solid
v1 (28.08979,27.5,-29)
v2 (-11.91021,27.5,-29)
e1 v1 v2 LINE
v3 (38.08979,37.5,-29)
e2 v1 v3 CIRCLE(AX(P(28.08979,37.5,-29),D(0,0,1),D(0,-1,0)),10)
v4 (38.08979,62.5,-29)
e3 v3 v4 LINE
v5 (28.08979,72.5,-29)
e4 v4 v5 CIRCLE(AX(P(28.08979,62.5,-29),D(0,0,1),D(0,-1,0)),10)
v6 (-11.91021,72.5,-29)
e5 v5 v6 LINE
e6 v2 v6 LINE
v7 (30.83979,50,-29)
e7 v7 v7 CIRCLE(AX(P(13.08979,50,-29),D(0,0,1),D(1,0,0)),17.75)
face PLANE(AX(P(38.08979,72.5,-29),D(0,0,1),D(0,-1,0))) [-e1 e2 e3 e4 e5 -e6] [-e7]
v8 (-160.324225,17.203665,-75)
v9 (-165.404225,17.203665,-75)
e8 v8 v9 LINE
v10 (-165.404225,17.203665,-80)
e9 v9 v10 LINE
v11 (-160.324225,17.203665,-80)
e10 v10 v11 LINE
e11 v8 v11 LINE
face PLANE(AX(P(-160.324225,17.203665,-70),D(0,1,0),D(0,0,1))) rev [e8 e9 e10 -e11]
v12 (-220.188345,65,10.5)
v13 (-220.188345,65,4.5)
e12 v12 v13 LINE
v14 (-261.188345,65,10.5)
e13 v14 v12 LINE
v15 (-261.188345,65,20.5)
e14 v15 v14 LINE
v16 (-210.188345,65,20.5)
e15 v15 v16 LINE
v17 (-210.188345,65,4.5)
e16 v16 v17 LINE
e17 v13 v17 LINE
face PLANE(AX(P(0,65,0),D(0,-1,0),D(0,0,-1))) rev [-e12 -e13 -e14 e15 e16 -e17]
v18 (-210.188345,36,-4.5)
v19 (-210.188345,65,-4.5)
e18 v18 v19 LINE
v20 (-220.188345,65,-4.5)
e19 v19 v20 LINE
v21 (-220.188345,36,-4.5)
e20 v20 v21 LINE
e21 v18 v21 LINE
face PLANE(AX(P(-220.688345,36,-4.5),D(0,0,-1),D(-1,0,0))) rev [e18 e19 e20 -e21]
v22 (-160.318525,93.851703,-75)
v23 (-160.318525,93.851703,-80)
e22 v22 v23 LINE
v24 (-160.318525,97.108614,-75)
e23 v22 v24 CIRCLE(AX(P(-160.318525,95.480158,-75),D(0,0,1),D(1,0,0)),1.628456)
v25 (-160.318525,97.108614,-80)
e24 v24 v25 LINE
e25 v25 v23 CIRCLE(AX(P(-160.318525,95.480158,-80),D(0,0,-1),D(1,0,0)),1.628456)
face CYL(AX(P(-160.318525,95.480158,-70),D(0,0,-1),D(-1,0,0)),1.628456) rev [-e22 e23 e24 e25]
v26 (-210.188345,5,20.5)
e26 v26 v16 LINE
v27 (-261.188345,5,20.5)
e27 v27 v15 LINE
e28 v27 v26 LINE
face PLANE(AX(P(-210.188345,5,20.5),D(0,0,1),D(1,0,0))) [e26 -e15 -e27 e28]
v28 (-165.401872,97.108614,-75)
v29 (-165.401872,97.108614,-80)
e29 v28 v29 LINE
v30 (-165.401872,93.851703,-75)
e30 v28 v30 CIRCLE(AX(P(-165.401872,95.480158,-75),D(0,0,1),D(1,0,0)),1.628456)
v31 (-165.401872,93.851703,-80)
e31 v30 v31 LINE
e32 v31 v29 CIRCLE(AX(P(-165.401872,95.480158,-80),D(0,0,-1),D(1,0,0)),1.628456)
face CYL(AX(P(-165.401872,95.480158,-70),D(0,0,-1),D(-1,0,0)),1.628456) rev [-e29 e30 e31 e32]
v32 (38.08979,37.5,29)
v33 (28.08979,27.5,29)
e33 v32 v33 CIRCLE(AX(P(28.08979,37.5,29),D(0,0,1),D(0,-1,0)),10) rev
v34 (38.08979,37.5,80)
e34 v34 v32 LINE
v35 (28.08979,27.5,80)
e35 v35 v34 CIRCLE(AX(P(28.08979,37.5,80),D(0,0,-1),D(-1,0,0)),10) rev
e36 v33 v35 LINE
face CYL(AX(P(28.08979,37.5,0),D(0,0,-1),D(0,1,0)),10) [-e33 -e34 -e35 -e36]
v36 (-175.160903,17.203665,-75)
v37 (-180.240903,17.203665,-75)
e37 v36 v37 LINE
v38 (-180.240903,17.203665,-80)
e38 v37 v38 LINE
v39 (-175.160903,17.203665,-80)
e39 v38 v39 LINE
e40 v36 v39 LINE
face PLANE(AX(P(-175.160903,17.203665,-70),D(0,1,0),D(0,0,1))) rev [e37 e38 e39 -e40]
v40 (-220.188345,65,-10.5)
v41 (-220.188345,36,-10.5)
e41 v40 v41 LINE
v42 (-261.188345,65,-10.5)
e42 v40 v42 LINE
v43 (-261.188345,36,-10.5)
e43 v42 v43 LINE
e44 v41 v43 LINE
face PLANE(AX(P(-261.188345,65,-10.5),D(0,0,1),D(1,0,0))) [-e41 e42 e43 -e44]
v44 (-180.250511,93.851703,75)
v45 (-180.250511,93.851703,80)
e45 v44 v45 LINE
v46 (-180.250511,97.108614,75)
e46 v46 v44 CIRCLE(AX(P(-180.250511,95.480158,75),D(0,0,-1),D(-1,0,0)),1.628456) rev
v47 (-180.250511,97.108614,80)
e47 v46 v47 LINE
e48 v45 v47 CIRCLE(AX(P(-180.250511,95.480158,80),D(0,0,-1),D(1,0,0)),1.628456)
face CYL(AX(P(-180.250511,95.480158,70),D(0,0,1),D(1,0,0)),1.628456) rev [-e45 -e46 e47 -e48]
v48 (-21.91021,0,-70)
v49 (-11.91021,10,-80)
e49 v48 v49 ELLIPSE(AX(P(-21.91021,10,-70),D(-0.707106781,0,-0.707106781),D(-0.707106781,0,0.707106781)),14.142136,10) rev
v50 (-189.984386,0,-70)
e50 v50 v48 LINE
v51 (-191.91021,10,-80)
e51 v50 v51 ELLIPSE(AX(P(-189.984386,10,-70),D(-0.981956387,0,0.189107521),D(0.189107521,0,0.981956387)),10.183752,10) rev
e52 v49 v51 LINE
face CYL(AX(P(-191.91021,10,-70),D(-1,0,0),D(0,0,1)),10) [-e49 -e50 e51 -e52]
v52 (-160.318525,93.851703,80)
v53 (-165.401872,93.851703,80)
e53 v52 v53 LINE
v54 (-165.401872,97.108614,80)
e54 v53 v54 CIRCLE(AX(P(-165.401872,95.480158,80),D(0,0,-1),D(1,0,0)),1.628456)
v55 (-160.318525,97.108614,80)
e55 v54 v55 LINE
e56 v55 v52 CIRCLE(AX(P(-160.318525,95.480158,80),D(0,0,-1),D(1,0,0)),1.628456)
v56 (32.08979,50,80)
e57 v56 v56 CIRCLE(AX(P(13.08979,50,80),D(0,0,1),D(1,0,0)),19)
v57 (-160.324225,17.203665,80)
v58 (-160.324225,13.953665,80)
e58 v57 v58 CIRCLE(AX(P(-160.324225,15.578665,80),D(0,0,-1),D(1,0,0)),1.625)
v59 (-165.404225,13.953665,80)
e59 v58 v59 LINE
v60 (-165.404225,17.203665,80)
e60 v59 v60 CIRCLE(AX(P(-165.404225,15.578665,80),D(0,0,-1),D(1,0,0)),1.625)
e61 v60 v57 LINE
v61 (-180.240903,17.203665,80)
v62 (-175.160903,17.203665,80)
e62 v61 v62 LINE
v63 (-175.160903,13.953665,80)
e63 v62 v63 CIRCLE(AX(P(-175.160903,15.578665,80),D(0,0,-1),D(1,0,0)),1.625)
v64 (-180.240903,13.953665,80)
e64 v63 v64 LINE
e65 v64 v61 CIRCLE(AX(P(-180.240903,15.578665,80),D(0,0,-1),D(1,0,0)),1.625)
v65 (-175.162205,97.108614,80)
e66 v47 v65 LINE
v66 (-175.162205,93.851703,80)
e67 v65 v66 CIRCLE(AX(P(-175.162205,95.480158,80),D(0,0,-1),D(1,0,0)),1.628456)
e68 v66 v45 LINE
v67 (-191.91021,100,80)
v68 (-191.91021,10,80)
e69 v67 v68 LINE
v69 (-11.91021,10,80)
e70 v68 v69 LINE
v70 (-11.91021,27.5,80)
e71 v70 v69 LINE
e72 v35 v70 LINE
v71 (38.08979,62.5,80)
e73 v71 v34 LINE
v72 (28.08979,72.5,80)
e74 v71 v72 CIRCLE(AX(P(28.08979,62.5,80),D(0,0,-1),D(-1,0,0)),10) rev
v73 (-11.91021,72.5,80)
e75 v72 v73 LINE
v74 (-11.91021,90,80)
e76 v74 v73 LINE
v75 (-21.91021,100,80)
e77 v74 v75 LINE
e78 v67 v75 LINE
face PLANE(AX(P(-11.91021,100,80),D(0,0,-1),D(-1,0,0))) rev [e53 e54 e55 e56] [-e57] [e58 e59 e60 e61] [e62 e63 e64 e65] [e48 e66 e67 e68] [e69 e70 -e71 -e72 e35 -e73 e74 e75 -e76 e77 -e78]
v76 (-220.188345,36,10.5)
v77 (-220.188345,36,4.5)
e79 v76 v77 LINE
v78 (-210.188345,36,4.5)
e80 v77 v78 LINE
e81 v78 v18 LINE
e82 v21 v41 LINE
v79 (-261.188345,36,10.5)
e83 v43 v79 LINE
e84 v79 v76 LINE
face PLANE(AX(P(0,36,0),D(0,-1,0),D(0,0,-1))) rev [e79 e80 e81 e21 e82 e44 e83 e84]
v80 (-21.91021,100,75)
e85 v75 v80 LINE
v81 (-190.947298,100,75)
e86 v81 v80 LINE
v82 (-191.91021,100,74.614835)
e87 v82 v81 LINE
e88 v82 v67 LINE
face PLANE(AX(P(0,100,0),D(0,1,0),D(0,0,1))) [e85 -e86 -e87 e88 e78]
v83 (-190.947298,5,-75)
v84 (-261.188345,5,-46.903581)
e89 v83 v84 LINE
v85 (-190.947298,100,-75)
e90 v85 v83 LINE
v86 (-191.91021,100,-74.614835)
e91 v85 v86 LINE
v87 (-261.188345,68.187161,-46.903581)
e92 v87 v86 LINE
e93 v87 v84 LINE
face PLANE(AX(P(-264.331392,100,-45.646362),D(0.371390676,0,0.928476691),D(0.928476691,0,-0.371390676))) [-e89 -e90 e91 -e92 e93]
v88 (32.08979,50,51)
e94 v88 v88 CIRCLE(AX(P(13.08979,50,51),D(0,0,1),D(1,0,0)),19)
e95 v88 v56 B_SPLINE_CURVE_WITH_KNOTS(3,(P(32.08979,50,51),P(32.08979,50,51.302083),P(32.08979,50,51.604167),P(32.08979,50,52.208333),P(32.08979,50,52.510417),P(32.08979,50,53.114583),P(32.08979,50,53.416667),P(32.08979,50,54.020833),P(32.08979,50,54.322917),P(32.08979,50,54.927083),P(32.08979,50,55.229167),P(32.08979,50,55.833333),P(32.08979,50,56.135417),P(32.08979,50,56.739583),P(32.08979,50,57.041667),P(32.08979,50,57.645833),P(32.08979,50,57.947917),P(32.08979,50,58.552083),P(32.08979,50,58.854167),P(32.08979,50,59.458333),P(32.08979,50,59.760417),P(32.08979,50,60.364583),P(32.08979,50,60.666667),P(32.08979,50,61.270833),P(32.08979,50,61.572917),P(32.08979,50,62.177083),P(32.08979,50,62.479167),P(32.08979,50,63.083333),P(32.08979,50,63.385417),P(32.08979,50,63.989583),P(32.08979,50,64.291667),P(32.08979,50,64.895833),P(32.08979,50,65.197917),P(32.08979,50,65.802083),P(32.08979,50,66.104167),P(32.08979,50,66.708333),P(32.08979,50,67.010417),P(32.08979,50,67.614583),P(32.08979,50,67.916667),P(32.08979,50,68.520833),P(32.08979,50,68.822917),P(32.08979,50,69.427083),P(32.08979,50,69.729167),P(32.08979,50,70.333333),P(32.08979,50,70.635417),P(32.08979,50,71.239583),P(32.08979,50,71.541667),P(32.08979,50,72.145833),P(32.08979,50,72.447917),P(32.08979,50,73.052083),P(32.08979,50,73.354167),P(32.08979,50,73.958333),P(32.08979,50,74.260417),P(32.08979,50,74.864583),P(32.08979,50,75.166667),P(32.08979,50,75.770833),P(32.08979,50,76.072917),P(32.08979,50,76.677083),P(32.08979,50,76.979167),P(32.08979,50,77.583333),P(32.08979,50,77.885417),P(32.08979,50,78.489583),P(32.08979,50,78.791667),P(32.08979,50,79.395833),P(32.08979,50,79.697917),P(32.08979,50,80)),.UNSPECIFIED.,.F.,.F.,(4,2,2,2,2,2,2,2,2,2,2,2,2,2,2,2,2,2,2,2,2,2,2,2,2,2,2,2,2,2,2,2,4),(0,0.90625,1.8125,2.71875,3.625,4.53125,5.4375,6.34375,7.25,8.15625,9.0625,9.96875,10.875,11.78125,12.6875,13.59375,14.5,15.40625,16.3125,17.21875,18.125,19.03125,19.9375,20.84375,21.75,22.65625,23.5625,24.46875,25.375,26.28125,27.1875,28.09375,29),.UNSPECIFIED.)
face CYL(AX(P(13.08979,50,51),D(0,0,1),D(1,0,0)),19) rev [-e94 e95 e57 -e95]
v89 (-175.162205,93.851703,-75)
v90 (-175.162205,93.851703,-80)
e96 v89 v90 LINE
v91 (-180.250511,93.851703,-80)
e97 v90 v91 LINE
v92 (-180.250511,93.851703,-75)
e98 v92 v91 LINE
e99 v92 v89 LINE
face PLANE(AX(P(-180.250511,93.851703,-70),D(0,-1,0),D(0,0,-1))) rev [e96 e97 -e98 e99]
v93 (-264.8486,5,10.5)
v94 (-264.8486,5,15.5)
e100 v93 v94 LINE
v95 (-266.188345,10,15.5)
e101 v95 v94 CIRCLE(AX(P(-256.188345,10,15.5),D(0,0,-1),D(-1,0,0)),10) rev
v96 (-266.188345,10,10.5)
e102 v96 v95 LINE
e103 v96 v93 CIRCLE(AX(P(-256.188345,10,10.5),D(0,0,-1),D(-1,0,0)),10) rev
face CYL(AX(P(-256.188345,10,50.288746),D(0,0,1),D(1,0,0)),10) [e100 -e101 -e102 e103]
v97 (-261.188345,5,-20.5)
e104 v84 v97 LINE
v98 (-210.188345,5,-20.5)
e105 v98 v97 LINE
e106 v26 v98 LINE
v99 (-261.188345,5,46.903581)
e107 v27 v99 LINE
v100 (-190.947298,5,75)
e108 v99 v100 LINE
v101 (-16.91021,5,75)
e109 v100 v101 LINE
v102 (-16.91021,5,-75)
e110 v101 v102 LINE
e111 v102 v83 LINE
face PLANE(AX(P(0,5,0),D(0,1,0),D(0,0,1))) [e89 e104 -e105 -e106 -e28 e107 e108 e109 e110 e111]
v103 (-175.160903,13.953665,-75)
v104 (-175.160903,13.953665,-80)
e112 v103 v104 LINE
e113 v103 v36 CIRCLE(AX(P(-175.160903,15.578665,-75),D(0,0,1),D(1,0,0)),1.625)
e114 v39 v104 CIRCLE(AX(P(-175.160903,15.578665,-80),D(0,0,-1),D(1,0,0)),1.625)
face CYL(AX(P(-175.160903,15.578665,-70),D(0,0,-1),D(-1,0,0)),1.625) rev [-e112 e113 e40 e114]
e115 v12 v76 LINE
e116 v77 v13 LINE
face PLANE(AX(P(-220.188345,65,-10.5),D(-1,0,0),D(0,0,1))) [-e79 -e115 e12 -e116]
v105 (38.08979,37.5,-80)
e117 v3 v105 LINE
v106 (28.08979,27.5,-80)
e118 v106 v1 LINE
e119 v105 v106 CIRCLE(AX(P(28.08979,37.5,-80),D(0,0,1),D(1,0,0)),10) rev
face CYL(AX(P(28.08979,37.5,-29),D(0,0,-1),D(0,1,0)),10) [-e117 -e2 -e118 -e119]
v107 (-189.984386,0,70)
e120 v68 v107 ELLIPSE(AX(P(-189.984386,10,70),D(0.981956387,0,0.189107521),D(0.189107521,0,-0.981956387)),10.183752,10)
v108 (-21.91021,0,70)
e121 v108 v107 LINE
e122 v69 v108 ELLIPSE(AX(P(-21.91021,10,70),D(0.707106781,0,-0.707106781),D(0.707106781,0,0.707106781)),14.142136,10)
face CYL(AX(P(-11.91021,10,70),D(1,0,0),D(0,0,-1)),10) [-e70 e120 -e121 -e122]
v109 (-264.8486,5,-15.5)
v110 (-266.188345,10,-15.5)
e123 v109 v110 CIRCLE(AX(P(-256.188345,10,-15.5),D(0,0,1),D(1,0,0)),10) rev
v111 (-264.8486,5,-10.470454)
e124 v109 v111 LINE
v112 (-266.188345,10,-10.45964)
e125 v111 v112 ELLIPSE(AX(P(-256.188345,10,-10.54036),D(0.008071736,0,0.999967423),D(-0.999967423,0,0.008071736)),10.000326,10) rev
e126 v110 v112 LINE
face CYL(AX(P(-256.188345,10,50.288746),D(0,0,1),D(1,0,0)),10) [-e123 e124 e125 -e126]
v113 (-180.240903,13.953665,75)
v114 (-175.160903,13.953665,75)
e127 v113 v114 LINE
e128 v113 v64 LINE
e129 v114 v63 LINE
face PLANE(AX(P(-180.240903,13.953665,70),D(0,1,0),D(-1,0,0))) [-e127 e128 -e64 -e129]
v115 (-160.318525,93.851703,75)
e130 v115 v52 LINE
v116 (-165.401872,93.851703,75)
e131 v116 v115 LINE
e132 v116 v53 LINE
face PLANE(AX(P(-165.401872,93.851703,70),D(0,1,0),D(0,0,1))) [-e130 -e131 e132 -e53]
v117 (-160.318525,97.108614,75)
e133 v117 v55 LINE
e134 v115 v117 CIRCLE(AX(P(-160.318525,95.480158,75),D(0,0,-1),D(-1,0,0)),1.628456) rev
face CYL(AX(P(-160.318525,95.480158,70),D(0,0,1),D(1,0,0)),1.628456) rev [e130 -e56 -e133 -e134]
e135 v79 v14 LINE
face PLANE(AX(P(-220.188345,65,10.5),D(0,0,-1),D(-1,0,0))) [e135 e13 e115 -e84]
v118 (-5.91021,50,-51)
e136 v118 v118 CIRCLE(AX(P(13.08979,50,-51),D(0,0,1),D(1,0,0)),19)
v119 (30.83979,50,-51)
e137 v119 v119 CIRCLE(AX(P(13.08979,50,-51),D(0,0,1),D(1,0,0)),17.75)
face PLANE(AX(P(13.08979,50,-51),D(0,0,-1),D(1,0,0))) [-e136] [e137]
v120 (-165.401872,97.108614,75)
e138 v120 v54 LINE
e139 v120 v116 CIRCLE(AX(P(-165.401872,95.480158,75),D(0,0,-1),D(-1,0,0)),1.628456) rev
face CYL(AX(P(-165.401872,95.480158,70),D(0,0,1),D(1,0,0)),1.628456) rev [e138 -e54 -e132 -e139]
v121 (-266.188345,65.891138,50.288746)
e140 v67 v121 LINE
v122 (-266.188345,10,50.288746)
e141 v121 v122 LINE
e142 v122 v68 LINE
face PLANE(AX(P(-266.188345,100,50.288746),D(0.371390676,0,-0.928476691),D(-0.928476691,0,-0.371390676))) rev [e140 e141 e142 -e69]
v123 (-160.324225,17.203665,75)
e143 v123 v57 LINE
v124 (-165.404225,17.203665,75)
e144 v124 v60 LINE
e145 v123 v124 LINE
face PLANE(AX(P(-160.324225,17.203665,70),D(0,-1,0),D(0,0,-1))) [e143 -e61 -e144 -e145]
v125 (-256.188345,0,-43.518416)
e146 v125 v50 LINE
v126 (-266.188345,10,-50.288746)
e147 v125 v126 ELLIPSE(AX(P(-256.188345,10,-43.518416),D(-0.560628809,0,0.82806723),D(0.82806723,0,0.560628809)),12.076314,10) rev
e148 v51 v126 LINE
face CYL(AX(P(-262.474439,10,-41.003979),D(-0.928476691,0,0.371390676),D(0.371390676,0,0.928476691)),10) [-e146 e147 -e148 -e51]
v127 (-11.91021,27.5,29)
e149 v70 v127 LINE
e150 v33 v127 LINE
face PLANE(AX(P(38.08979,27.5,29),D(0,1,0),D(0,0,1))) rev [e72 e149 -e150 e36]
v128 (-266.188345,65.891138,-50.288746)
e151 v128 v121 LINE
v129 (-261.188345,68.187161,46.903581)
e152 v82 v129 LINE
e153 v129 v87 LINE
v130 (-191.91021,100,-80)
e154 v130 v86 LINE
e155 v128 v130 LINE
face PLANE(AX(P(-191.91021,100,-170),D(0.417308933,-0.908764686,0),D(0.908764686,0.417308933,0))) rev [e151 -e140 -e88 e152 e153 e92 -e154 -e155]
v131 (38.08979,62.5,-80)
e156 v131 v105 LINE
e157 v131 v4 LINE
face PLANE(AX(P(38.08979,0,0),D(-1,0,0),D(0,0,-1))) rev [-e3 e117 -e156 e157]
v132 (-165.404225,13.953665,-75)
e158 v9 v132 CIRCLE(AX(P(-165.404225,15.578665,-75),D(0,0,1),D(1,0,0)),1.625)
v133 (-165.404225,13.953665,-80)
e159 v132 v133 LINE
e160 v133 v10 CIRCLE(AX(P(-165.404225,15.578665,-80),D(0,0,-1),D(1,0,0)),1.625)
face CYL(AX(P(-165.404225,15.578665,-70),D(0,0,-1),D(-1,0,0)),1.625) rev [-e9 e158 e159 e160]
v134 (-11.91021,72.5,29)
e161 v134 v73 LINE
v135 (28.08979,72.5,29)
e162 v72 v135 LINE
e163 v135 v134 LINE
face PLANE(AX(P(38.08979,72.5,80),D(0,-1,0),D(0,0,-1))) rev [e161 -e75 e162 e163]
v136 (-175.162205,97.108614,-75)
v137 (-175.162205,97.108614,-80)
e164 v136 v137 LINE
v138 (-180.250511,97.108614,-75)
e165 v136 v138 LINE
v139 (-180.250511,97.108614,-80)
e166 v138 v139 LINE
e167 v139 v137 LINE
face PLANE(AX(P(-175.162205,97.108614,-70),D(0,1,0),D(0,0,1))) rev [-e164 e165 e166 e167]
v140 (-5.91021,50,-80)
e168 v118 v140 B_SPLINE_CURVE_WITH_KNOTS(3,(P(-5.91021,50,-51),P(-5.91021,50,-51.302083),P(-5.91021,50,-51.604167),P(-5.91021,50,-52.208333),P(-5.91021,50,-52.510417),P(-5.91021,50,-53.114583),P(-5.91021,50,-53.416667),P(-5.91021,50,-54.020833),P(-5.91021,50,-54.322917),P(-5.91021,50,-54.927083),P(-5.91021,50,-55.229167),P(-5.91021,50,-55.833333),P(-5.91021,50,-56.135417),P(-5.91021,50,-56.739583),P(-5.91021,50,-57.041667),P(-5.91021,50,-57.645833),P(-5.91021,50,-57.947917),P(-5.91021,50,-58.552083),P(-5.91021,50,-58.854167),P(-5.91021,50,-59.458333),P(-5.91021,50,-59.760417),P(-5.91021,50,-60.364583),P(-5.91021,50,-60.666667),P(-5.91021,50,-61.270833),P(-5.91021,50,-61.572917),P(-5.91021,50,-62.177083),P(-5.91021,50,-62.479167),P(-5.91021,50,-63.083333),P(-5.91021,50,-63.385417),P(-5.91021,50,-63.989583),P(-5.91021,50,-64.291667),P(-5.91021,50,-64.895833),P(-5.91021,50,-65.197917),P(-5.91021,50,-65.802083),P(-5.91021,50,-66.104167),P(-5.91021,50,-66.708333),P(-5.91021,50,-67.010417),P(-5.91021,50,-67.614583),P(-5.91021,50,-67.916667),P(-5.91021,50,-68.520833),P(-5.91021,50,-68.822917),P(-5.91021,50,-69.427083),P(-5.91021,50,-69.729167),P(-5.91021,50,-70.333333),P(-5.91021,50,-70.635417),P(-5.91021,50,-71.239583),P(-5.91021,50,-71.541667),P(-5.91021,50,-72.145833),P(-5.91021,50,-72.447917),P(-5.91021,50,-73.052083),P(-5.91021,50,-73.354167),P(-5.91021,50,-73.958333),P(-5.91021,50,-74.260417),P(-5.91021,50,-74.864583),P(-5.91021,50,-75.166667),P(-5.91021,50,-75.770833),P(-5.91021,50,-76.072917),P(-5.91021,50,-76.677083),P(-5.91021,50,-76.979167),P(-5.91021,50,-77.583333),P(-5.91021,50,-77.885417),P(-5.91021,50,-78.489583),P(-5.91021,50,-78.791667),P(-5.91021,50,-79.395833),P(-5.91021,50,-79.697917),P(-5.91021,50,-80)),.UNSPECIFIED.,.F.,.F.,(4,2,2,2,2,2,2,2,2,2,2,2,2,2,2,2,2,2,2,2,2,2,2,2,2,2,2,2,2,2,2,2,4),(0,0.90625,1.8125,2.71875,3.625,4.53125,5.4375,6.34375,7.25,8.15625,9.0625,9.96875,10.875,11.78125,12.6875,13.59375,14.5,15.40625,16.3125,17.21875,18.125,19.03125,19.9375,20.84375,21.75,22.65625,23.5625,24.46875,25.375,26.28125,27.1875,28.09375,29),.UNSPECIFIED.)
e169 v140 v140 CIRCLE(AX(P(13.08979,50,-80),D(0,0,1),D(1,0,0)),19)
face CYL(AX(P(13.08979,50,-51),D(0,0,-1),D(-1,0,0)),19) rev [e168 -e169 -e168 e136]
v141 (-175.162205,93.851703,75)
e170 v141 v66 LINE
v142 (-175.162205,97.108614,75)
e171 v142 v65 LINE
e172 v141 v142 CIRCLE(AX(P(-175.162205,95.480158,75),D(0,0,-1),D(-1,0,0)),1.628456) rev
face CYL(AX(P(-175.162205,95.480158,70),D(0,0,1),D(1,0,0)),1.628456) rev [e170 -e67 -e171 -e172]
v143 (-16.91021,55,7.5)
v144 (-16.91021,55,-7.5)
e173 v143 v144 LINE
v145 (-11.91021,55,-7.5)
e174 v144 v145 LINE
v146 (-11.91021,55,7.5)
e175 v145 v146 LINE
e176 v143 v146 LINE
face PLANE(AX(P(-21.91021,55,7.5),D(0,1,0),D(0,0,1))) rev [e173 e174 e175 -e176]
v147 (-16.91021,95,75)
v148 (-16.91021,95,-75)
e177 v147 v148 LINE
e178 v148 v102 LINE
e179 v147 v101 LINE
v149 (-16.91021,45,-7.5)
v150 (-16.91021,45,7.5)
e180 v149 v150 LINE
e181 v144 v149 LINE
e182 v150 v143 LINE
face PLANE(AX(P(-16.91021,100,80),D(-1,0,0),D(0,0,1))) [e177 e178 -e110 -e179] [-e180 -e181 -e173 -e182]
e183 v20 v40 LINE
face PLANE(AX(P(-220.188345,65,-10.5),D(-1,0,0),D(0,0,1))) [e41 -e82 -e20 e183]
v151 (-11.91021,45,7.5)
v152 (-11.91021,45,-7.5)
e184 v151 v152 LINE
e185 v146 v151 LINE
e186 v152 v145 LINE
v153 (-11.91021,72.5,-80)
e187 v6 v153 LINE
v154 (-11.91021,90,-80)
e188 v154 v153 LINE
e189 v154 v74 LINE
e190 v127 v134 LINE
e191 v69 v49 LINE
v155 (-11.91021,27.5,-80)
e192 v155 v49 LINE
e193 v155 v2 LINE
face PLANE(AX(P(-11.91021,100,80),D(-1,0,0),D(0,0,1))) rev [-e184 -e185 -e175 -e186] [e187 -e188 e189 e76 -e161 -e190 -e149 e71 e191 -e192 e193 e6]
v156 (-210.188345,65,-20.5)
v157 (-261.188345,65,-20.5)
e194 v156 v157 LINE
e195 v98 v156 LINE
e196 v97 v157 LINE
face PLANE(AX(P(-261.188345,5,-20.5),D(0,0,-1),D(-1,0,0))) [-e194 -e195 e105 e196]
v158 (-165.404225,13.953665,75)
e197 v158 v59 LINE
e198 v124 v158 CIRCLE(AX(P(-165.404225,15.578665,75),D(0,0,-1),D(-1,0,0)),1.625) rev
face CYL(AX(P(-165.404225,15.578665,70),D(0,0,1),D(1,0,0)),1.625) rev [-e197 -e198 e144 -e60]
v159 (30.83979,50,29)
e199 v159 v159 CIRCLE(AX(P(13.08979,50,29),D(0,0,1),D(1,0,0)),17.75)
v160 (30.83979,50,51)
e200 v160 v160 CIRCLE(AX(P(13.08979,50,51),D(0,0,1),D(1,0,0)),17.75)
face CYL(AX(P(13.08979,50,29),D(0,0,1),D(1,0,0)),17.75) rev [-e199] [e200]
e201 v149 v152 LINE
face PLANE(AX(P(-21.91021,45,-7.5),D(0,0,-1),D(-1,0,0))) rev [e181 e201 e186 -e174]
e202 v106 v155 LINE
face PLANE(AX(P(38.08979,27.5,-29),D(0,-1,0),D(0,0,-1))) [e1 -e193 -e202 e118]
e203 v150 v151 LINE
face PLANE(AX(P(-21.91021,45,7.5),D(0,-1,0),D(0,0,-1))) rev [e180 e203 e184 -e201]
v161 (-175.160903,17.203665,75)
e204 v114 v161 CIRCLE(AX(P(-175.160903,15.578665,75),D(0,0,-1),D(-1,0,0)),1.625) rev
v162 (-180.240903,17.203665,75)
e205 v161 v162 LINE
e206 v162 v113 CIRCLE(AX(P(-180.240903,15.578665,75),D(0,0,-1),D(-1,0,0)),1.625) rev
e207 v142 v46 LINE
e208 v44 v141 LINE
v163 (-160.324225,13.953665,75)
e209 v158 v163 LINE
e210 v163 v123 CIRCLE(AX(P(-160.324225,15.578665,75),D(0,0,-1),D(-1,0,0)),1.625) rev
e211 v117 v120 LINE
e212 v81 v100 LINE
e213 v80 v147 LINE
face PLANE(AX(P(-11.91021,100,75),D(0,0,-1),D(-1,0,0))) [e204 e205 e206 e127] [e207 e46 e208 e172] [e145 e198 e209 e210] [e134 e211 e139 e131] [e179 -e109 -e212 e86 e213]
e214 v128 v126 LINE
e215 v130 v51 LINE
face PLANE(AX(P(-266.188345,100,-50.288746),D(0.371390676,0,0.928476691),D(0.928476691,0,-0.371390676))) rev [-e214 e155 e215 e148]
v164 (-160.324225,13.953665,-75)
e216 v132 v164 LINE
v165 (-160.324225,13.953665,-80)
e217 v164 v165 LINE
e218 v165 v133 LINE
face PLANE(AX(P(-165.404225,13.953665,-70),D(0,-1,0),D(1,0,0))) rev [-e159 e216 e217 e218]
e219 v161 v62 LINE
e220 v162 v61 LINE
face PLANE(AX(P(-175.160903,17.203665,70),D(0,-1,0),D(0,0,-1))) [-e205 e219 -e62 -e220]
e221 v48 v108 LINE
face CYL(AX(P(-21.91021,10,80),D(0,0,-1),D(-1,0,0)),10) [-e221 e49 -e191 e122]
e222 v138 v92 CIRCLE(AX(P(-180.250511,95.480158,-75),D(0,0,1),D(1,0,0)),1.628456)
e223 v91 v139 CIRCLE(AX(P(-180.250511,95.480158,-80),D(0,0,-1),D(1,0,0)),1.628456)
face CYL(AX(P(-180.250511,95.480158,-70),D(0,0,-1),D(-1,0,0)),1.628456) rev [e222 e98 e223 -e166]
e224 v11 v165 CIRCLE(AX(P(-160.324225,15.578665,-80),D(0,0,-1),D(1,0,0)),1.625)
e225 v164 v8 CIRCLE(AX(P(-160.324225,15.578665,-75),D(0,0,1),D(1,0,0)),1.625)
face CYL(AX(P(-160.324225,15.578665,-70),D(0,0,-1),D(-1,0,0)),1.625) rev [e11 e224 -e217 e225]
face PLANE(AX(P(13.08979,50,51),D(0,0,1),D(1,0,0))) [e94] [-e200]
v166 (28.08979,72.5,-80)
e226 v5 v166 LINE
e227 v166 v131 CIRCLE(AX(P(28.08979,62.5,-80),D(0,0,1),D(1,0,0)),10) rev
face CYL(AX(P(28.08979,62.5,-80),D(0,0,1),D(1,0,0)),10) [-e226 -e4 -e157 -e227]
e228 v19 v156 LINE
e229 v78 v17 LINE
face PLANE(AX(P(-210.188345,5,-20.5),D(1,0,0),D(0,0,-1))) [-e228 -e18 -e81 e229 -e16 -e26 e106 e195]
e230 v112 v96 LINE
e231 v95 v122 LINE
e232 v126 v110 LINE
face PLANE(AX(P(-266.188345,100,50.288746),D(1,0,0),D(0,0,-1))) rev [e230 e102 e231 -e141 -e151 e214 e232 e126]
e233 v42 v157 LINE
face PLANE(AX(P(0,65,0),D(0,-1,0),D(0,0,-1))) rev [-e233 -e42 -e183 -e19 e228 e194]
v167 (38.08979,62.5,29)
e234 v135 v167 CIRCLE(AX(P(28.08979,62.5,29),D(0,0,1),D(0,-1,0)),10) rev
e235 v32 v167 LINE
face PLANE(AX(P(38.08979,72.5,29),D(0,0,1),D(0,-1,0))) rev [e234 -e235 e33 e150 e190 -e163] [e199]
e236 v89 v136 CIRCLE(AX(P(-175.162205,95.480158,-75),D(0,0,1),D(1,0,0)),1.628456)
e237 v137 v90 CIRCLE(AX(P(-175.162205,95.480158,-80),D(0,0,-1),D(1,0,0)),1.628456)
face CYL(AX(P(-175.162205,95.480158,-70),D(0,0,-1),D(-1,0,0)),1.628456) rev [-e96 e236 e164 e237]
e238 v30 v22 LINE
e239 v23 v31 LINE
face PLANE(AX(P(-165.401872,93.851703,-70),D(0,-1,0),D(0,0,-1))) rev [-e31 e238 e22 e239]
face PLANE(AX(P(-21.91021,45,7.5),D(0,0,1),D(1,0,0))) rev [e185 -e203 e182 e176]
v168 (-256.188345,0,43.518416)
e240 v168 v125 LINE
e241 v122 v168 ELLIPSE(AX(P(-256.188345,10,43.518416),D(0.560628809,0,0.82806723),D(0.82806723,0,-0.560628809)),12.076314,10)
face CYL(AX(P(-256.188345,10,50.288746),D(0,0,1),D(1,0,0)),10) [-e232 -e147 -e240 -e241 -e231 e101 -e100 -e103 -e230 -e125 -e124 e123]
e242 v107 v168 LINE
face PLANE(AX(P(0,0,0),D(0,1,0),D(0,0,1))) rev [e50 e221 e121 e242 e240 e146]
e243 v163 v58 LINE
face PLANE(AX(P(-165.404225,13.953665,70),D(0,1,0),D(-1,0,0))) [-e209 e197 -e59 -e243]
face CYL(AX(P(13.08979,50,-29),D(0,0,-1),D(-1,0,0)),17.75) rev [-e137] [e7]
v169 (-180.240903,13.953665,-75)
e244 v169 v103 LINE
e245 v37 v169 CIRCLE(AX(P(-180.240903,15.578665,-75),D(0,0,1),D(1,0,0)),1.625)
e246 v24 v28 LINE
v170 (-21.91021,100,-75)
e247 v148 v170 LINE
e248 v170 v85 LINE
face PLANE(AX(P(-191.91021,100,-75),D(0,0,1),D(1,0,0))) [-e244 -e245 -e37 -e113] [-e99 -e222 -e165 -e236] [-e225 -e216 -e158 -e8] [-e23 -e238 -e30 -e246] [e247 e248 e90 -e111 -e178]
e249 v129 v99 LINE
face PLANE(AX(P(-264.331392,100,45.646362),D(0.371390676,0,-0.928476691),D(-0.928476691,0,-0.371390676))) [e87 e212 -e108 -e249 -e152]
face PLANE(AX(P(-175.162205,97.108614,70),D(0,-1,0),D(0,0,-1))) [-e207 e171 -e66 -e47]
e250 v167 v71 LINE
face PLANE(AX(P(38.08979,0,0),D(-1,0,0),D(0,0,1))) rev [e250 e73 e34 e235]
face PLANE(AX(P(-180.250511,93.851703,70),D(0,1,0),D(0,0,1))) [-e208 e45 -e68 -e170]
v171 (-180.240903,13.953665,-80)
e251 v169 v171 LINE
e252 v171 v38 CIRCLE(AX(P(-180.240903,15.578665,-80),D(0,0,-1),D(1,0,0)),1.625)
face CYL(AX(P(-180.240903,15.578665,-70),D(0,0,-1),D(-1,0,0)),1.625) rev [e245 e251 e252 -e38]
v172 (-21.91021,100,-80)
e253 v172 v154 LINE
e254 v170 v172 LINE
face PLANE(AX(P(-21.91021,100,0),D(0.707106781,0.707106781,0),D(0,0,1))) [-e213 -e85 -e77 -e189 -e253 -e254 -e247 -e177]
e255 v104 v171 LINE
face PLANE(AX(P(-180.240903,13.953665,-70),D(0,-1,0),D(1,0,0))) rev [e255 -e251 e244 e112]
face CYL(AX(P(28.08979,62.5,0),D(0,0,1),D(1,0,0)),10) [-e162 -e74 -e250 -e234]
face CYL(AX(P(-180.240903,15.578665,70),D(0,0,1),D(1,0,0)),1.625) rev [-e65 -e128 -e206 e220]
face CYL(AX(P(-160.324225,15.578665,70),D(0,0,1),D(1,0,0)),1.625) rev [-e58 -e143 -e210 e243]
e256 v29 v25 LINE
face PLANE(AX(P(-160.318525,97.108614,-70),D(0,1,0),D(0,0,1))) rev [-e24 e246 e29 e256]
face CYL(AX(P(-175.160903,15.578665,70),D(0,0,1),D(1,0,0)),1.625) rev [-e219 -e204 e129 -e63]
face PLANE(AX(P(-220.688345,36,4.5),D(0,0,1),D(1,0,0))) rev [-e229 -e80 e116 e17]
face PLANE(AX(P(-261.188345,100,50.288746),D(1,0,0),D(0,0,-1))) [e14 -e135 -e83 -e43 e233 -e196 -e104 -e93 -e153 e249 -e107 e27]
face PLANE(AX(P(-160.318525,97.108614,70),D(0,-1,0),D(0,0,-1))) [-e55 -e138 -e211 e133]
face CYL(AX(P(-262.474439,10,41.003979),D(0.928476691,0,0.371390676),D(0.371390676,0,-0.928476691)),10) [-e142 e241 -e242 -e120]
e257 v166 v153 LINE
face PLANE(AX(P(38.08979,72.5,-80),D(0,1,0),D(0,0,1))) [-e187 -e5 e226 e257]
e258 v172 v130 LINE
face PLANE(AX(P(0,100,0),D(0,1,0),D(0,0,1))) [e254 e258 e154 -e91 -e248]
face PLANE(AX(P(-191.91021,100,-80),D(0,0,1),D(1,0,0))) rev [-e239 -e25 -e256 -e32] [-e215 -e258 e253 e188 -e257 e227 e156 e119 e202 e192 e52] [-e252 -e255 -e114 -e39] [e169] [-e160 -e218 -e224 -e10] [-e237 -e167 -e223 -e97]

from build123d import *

# Parameters (mm, degrees)
BOSS_EXTRUDE1_DEPTH = 100
SHELL1_T            = -5
CHAMFER1_SIZE       = 10
CHAMFER2_SIZE       = 10
FILLET2_R           = 10
CUT_EXTRUDE1_DEPTH  = 250
BOSS_EXTRUDE5_DEPTH = 60
SKETCH8_W           = 41
SKETCH8_H           = 21
BOSS_EXTRUDE6_DEPTH = 31
SKETCH12_W          = 51
SKETCH12_H          = 45
BOSS_EXTRUDE7_DEPTH = 50
SKETCH26_R          = 19
CUT_EXTRUDE2_DEPTH  = 29
SKETCH28_R          = 17.75
CUT_EXTRUDE3_DEPTH  = 22
BOSS_EXTRUDE8_DEPTH = 60
SKETCH30_W          = 10.5
SKETCH30_H          = 9
CUT_EXTRUDE4_DEPTH  = 29
FILLET4_R           = 10
SKETCH32_W          = 15
SKETCH32_H          = 10
CUT_EXTRUDE7_DEPTH  = 10
CUT_EXTRUDE8_DEPTH  = 10
SKETCH37_W          = 177.863308591
SKETCH37_H          = 31
CUT_EXTRUDE10_DEPTH = 84
FILLET11_R          = 10


with BuildPart() as part:
    # Sketch2 → Boss-Extrude1 (new body)
    with BuildSketch(Plane(origin=(0, 0, 0), x_dir=(1, 0, 0), z_dir=(0, 1, 0))):
        Polygon((-11.910210202, -80), (-11.910210202, 80), (-191.910210202, 80), (-266.188345473, 50.288745892), (-266.188345473, -50.288745892), (-191.910210202, -80), align=None)
    extrude(amount=BOSS_EXTRUDE1_DEPTH)

    # Shell1
    shell1_openings = [part.faces().sort_by_distance(p)[0] for p in [
        (-133.177254811, 100, 0),
    ]]
    offset(amount=SHELL1_T, openings=shell1_openings, kind=Kind.INTERSECTION)

    # Chamfer1
    # the kernel refuses this chamfer: 10 mm, written as the material it takes off along each edge
    with BuildSketch(Plane(origin=(-11.910210202, 100, 105.71682988), x_dir=(0.027495876610586317, -0.9996219169112968, 0), z_dir=(0, 0, -1))) as chamfer1_piece_1:
        Polygon((CHAMFER1_SIZE * 0.999621916911, CHAMFER1_SIZE * 0.0274958766106), (-CHAMFER1_SIZE * 0.0274958766106, CHAMFER1_SIZE * 0.999621916911), (0, 0), align=None)
    extrude(amount=211.433659759, mode=Mode.SUBTRACT)

    # Chamfer2
    # the kernel refuses this chamfer: 10 mm, written as the material it takes off along each edge
    with BuildSketch(Plane(origin=(-266.188345473, 100, -76.005575771), x_dir=(-0.0274958766105877, -0.9996219169112968, 0), z_dir=(0, 0, 1))) as chamfer2_piece_1:
        Polygon((CHAMFER2_SIZE * 0.999621916911, CHAMFER2_SIZE * 0.0274958766106), (-CHAMFER2_SIZE * 0.0274958766106, CHAMFER2_SIZE * 0.999621916911), (0, 0), align=None)
    extrude(amount=152.011151543, mode=Mode.SUBTRACT)

    # Fillet2
    fillet2_edges = [part.edges().sort_by_distance(p)[0] for p in [
        (-11.910210202, 0, 0),
        (-101.910210202, 0, 80),
        (-229.049277838, 0, 65.144372946),
        (-266.188345473, 0, 0),
        (-229.049277838, 0, -65.144372946),
        (-101.910210202, 0, -80),
    ]]
    fillet(fillet2_edges, radius=FILLET2_R)

    # Sketch3 → Cut-Extrude1 (cut)
    with BuildSketch(Plane.XY.offset(80)):
        Polygon((-191.910210202, 100), (-266.188345473, 65.891137916), (-266.188345473, 100), align=None)
    extrude(amount=-CUT_EXTRUDE1_DEPTH, mode=Mode.SUBTRACT)

    # Sketch4 → Boss-Extrude5 (add)
    with BuildSketch(Plane(origin=(0, 5, 0), x_dir=(1, 0, 0), z_dir=(0, 1, 0))):
        Polygon((-215.188345473, -15.5), (-444.051654064, -15.5), (-444.051654064, 15.5), (-261.610116413, 15.5), (-215.188345473, 15.5), align=None)
        Polygon((-261.188345473, 10.5), (-220.188345473, 10.5), (-220.188345473, -10.5), (-384.777774205, -10.5), (-384.777774205, 9.502386243), align=None, mode=Mode.SUBTRACT)
    extrude(amount=BOSS_EXTRUDE5_DEPTH)

    # Sketch8 → Boss-Extrude6 (add)
    with BuildSketch(Plane(origin=(0, 5, 0), x_dir=(1, 0, 0), z_dir=(0, 1, 0))):
        with Locations((-240.688345473, 0)):
            Rectangle(SKETCH8_W, SKETCH8_H)
    extrude(amount=BOSS_EXTRUDE6_DEPTH)

    # Sketch12 → Boss-Extrude7 (add)
    with BuildSketch(Plane(origin=(-11.910210202, 0, 0), x_dir=(0, 0, -1), z_dir=(1, 0, 0))):
        with Locations((-54.5, 50)):
            Rectangle(SKETCH12_W, SKETCH12_H)
    boss_extrude7 = extrude(amount=BOSS_EXTRUDE7_DEPTH)

    # Sketch26 → Cut-Extrude2 (cut)
    with BuildSketch(Plane.XY.offset(80)):
        with Locations((13.089789798, 50)):
            Circle(SKETCH26_R)
    cut_extrude2 = extrude(amount=-CUT_EXTRUDE2_DEPTH, mode=Mode.SUBTRACT)

    # Sketch28 → Cut-Extrude3 (cut)
    with BuildSketch(Plane.XY.offset(51)):
        with Locations((13.089789798, 50)):
            Circle(SKETCH28_R)
    cut_extrude3 = extrude(amount=-CUT_EXTRUDE3_DEPTH, mode=Mode.SUBTRACT)

    # Mirror1: Boss-Extrude7, Cut-Extrude2, Cut-Extrude3 across plane
    add(boss_extrude7.mirror(Plane.XY))
    add(cut_extrude2.mirror(Plane.XY), mode=Mode.SUBTRACT)
    add(cut_extrude3.mirror(Plane.XY), mode=Mode.SUBTRACT)

    # Sketch29 → Boss-Extrude8 (add)
    with BuildSketch(Plane(origin=(0, 65, 0), x_dir=(1, 0, 0), z_dir=(0, 1, 0))):
        Polygon((-261.188345473, 20.5), (-210.188345473, 20.5), (-210.188345473, -20.5), (-261.188345473, -20.5), (-261.188345473, -15.5), (-215.188345473, -15.5), (-215.188345473, 15.5), (-261.188345473, 15.5), align=None)
    extrude(amount=-BOSS_EXTRUDE8_DEPTH)

    # Sketch30 → Cut-Extrude4 (cut)
    with BuildSketch(Plane(origin=(0, 65, 0), x_dir=(1, 0, 0), z_dir=(0, 1, 0))):
        with Locations((-215.438345473, 0)):
            Rectangle(SKETCH30_W, SKETCH30_H)
    extrude(amount=-CUT_EXTRUDE4_DEPTH, mode=Mode.SUBTRACT)

    # Fillet4
    fillet4_edges = [part.edges().sort_by_distance(p)[0] for p in [
        (38.089789798, 72.5, 54.5),
        (38.089789798, 27.5, 54.5),
        (38.089789798, 27.5, -54.5),
        (38.089789798, 72.5, -54.5),
    ]]
    fillet(fillet4_edges, radius=FILLET4_R)

    # Sketch32 → Cut-Extrude7 (cut)
    with BuildSketch(Plane(origin=(-11.910210202, 0, 0), x_dir=(0, 0, -1), z_dir=(1, 0, 0))):
        with Locations((0, 50)):
            Rectangle(SKETCH32_W, SKETCH32_H)
    extrude(amount=-CUT_EXTRUDE7_DEPTH, mode=Mode.SUBTRACT)

    # Sketch34 → Cut-Extrude8 (cut)
    with BuildSketch(Plane(origin=(0, 0, -80), x_dir=(-1, 0, 0), z_dir=(0, 0, -1))):
        with BuildLine():
            Line((175.162205164, 97.108614193), (180.250510852, 97.108614193))
            ThreePointArc((180.250510852, 97.108614193), (181.878966661, 95.480158384), (180.250510852, 93.851702575))
            Line((180.250510852, 93.851702575), (175.162205164, 93.851702575))
            ThreePointArc((175.162205164, 93.851702575), (173.533749356, 95.480158384), (175.162205164, 97.108614193))
        make_face()
        with BuildLine():
            Line((160.318525442, 97.108614193), (165.401872055, 97.108614193))
            ThreePointArc((165.401872055, 97.108614193), (167.030327863, 95.480158384), (165.401872055, 93.851702575))
            Line((165.401872055, 93.851702575), (160.318525442, 93.851702575))
            ThreePointArc((160.318525442, 93.851702575), (158.690069633, 95.480158384), (160.318525442, 97.108614193))
        make_face()
        with BuildLine():
            Line((175.160903312, 17.203664766), (180.240903312, 17.203664766))
            ThreePointArc((180.240903312, 17.203664766), (181.865903312, 15.578664766), (180.240903312, 13.953664766))
            Line((180.240903312, 13.953664766), (175.160903312, 13.953664766))
            ThreePointArc((175.160903312, 13.953664766), (173.535903312, 15.578664766), (175.160903312, 17.203664766))
        make_face()
        with BuildLine():
            Line((160.324224815, 17.203664766), (165.404224815, 17.203664766))
            ThreePointArc((165.404224815, 17.203664766), (167.029224815, 15.578664766), (165.404224815, 13.953664766))
            Line((165.404224815, 13.953664766), (160.324224815, 13.953664766))
            ThreePointArc((160.324224815, 13.953664766), (158.699224815, 15.578664766), (160.324224815, 17.203664766))
        make_face()
    cut_extrude8 = extrude(amount=-CUT_EXTRUDE8_DEPTH, mode=Mode.SUBTRACT)

    # Mirror2: Cut-Extrude8 across plane
    add(cut_extrude8.mirror(Plane.XY), mode=Mode.SUBTRACT)

    # Sketch37 → Cut-Extrude10 (cut)
    with BuildSketch(Plane(origin=(0, 65, 0), x_dir=(1, 0, 0), z_dir=(0, 1, 0))):
        with Locations((-355.119999769, 0)):
            Rectangle(SKETCH37_W, SKETCH37_H)
    extrude(amount=-CUT_EXTRUDE10_DEPTH, mode=Mode.SUBTRACT)

    # Fillet11
    # the kernel refuses this fillet: 10 mm, written as the material it takes off along each edge
    with BuildSketch(Plane(origin=(-266.188345473, 5, 28), x_dir=(0, 1, 0), z_dir=(0, 0, -1))) as fillet11_piece_1:
        with BuildLine():
            CenterArc((5, 10), FILLET11_R, 240, 30)
            Line((0, 1.339745962), (-0.1, 1.166540881))
            ThreePointArc((-0.1, 1.166540881), (-0.2, 0.669872981), (-0.2, 0))
            Line((-0.2, 0), (0, -0.2))
            Line((0, -0.2), (5, -0.2))
            Line((5, -0.2), (5, 0))
        make_face()
    extrude(amount=30, mode=Mode.SUBTRACT)
    with BuildSketch(Plane(origin=(-266.188345473, 5, 2.040359995), x_dir=(0, 1, 0), z_dir=(0, 0, -1))) as fillet11_piece_2:
        with BuildLine():
            CenterArc((5, 10), FILLET11_R, 240, 30)
            Line((0, 1.339745962), (-0.1, 1.166540881))
            ThreePointArc((-0.1, 1.166540881), (-0.2, 0.669872981), (-0.2, 0))
            Line((-0.2, 0), (0, -0.2))
            Line((0, -0.2), (5, -0.2))
            Line((5, -0.2), (5, 0))
        make_face()
    extrude(amount=30.040359995, mode=Mode.SUBTRACT)


solid = part.part
